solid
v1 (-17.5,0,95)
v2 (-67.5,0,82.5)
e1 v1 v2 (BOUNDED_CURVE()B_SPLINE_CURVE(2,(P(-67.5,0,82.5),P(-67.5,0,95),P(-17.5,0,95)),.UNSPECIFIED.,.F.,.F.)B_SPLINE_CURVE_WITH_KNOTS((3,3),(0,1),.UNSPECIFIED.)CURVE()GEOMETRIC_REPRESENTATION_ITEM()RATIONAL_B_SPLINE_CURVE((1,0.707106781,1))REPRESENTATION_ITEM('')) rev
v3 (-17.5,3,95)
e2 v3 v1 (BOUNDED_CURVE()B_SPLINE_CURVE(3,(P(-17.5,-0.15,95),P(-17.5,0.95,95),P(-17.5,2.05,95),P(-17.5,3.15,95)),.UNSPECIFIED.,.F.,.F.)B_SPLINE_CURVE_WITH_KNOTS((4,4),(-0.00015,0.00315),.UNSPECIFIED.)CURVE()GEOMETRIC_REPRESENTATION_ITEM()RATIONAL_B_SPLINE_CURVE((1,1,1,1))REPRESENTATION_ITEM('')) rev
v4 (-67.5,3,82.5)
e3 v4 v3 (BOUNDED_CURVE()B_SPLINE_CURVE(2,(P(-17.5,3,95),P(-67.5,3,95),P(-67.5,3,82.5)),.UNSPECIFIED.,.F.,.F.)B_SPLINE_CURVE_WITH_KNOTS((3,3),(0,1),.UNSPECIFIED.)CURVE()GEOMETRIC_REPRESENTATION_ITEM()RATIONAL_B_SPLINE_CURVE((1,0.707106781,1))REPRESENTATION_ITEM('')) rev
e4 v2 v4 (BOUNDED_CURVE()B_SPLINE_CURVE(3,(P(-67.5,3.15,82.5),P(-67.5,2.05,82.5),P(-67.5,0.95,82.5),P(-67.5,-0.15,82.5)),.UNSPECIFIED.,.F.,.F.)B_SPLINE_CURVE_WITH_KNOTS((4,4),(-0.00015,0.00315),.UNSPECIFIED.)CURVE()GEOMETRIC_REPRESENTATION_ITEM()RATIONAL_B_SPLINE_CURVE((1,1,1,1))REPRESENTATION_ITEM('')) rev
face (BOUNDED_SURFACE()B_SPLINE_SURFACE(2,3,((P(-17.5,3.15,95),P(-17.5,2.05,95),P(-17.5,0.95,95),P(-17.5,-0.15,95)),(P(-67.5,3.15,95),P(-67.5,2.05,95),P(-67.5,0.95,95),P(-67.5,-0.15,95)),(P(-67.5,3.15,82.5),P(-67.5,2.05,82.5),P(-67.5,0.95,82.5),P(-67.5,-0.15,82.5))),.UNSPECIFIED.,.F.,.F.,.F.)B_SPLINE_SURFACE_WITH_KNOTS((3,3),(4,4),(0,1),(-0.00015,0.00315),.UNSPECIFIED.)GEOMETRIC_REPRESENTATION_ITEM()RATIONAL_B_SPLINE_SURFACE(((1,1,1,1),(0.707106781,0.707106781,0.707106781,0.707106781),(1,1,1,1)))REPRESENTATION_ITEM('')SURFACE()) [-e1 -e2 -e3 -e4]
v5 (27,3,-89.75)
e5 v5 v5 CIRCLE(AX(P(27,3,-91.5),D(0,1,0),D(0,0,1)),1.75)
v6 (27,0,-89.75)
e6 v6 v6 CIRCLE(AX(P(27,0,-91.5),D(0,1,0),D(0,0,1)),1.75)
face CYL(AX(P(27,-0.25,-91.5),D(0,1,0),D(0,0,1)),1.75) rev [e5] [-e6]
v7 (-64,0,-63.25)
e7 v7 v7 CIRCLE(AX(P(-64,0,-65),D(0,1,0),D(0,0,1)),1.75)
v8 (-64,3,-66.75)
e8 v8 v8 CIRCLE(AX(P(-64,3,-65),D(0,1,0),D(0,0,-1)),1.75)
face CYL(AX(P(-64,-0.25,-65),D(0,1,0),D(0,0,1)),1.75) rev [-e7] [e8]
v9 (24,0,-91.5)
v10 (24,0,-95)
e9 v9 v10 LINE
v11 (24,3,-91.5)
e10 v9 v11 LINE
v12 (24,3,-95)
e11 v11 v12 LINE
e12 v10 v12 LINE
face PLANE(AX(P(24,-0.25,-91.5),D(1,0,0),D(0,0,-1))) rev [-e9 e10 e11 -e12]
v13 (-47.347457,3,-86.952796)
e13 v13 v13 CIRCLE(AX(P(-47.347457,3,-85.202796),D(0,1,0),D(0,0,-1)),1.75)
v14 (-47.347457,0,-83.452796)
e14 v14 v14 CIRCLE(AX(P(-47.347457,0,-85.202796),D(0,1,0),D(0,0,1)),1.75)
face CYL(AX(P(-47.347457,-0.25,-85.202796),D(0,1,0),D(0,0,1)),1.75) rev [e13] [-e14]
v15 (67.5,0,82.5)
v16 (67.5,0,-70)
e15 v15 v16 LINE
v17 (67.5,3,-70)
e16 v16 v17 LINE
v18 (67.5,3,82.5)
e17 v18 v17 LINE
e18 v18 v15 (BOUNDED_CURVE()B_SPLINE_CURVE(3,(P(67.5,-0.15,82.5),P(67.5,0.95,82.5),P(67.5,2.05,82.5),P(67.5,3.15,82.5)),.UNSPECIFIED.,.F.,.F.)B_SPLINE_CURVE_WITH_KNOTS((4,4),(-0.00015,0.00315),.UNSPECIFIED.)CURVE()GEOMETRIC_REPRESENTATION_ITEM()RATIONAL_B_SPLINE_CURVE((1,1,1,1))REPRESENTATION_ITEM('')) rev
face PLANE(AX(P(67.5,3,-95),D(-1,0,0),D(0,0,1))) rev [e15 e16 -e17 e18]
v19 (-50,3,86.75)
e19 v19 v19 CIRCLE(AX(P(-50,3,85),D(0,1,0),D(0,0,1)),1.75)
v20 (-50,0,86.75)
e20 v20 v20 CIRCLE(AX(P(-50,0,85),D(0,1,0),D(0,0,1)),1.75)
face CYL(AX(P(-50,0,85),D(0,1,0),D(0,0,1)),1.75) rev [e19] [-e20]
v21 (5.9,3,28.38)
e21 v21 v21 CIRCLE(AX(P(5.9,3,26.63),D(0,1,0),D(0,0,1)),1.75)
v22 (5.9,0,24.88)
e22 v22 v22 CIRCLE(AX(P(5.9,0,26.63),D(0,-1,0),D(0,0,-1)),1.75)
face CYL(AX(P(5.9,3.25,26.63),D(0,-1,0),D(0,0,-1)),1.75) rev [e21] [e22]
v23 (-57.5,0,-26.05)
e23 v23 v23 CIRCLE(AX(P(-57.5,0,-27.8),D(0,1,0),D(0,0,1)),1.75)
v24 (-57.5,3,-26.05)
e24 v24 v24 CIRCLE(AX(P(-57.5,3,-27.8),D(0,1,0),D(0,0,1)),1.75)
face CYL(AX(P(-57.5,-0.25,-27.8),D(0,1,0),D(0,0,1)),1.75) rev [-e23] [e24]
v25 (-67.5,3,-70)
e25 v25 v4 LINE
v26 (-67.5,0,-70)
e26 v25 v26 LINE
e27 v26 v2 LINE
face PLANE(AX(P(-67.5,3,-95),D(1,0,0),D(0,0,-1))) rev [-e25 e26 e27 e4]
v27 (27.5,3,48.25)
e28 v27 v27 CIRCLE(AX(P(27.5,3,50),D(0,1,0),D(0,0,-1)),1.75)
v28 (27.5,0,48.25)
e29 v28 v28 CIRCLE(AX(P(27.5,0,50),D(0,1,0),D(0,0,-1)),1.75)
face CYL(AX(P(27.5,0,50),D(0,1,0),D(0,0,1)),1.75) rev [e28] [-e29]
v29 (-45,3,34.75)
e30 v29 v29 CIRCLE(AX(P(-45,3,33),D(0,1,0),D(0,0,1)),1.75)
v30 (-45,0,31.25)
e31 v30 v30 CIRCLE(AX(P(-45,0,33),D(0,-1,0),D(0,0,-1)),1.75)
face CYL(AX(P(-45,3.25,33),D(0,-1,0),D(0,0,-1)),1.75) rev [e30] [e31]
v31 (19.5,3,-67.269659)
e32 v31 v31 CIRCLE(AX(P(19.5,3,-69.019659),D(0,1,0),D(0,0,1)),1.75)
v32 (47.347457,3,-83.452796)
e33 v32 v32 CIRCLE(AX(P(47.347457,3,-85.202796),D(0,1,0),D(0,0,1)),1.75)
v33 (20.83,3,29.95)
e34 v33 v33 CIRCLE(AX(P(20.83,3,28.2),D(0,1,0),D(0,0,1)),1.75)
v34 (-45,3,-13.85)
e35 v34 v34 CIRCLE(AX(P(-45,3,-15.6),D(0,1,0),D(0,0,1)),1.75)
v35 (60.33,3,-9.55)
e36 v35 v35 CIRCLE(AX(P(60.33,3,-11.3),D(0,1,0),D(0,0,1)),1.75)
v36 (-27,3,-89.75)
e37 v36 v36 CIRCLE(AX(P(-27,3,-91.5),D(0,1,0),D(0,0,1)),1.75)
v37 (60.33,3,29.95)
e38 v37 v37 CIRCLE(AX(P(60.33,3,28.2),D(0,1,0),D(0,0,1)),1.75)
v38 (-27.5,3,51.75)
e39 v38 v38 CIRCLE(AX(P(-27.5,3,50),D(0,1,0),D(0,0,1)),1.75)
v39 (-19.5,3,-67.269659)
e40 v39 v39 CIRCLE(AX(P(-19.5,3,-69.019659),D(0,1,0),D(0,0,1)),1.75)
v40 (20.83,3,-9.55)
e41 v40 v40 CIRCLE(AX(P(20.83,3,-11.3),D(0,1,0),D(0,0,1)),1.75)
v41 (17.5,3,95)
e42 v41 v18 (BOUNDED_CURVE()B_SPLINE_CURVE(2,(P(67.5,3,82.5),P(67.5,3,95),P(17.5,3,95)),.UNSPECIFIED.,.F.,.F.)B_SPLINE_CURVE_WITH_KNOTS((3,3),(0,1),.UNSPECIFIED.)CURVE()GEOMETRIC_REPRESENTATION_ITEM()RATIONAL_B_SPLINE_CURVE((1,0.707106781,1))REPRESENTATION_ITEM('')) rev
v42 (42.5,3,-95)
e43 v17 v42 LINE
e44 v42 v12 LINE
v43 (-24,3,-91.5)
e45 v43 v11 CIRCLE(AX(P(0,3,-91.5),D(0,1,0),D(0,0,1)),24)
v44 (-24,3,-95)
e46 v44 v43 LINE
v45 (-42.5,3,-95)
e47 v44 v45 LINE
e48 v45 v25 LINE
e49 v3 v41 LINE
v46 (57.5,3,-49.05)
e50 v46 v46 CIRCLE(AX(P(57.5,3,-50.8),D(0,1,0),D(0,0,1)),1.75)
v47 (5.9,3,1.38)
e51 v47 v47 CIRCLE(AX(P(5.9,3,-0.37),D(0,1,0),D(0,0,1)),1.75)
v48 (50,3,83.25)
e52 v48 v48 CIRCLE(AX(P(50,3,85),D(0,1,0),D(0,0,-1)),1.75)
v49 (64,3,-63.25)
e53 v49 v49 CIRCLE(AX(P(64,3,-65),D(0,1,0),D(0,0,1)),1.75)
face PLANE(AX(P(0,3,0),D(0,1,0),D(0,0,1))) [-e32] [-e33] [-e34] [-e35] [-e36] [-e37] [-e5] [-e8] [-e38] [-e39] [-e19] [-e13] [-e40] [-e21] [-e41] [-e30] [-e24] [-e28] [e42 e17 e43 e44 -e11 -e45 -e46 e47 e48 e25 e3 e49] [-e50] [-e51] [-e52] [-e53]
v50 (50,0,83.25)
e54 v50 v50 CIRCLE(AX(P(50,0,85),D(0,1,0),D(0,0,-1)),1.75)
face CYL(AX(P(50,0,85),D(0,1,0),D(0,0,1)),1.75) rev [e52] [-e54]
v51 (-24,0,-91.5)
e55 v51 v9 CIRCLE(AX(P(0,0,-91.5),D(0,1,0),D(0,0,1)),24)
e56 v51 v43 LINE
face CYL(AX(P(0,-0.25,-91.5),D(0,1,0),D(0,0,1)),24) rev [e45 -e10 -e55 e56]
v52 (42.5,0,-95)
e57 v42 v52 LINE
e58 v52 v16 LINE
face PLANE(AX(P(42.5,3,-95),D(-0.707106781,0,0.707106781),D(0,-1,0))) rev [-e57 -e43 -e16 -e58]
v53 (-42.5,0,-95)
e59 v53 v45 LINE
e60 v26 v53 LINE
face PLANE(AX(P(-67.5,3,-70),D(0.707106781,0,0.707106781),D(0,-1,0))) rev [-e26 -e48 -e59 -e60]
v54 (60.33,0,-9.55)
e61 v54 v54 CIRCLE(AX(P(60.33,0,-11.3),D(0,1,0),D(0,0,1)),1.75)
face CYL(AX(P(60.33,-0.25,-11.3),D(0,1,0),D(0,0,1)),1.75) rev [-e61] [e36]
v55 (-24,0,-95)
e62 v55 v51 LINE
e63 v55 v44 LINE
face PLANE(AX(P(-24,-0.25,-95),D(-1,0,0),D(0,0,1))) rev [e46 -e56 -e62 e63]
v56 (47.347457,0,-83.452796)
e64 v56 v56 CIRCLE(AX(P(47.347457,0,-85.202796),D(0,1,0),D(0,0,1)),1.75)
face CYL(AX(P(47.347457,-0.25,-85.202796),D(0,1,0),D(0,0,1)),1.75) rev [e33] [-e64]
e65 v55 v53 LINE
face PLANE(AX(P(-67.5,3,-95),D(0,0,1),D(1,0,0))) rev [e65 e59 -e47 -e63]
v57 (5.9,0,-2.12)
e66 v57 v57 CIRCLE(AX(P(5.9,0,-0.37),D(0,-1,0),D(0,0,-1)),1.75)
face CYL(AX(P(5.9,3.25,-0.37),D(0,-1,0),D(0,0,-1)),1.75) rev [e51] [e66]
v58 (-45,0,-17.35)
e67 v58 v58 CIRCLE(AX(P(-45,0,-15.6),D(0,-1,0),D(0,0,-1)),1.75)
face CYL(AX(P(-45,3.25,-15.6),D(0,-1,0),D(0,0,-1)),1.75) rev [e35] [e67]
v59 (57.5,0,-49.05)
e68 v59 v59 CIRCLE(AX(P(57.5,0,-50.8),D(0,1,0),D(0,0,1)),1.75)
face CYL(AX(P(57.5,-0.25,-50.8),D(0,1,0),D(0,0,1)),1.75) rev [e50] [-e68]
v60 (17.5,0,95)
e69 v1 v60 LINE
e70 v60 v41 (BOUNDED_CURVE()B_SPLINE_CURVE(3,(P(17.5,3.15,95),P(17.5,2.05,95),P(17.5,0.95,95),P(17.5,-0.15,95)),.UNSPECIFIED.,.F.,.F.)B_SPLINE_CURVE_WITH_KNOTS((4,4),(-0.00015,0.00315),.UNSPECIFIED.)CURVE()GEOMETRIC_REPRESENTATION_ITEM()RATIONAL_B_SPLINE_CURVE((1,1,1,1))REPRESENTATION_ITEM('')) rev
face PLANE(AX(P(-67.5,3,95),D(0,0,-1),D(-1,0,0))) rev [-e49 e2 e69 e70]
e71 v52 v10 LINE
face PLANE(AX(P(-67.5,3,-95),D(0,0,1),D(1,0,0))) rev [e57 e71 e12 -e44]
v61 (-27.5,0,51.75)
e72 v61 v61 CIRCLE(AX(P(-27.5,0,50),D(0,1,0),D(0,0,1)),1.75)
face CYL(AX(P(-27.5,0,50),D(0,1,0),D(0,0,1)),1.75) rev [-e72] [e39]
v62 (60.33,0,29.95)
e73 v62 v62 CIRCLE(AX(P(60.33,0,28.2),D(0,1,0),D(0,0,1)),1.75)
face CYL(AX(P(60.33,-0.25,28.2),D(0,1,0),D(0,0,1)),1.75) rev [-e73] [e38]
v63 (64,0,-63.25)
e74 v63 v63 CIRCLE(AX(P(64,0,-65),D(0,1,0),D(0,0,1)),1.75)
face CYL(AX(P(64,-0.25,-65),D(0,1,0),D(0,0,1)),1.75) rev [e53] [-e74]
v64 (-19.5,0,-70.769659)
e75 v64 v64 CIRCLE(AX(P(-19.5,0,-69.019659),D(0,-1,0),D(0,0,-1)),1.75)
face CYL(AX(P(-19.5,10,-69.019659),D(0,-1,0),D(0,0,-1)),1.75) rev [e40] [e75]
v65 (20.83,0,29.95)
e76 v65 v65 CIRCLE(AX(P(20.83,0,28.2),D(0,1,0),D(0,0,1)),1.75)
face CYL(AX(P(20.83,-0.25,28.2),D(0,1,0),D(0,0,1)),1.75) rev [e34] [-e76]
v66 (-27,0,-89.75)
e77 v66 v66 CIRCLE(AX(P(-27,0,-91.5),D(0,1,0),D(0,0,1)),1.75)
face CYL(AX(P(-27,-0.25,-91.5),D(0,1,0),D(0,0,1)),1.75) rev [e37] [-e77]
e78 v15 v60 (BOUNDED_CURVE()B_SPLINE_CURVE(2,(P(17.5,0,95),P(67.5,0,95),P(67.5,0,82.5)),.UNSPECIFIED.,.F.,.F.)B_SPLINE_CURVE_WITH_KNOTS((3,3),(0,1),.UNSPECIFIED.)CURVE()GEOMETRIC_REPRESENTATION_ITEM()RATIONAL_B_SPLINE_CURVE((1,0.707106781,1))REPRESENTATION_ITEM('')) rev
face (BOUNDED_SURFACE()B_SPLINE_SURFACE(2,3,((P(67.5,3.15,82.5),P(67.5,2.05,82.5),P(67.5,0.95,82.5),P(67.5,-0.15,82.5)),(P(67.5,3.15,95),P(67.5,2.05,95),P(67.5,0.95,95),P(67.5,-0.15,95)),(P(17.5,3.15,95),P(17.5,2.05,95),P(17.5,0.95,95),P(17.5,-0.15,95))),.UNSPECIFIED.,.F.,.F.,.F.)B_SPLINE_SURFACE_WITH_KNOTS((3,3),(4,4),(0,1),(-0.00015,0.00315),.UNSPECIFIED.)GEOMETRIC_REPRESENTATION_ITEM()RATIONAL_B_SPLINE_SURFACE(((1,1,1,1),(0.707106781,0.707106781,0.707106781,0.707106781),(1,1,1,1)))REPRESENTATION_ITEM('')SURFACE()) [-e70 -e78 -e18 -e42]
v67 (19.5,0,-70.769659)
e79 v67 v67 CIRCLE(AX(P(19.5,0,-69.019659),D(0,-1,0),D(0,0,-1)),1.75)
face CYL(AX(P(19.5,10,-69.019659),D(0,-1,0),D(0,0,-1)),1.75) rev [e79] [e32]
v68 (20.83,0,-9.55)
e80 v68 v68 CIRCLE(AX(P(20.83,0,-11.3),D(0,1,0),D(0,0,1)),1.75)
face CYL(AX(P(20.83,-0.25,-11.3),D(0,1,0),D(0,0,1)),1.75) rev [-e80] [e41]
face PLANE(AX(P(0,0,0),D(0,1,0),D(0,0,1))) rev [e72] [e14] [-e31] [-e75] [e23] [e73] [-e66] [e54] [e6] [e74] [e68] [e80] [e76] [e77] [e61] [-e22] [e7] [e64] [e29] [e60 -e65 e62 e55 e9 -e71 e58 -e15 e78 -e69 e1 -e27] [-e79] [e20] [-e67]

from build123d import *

# Parameters (mm, degrees)
SKETCH2_W           = 135
SKETCH2_H           = 190
BOSS_EXTRUDE2_DEPTH = 3
SKETCH3_R           = 1.75
CUT_EXTRUDE1_DEPTH  = 117.577227622
FILLET1_SIZE        = 12.5
FILLET1_SIZE_2      = 50
FILLET2_SIZE        = 12.5
FILLET2_SIZE_2      = 50
CHAMFER2_SIZE       = 25
CHAMFER3_SIZE       = 25
CUT_EXTRUDE5_DEPTH  = 117.577227764
SKETCH8_R           = 1.75
CUT_EXTRUDE6_DEPTH  = 117.577227764
SKETCH11_R          = 1.75
CUT_EXTRUDE8_DEPTH  = 117.577227764
SKETCH12_R          = 1.75
CUT_EXTRUDE9_DEPTH  = 117.577227764
SKETCH18_R          = 1.75
CUT_EXTRUDE10_DEPTH = 117.577227764
SKETCH19_R          = 1.75
CUT_EXTRUDE11_DEPTH = 117.577227764
SKETCH20_R          = 1.75
CUT_EXTRUDE12_DEPTH = 10


with BuildPart() as part:
    # Sketch2 → Boss-Extrude2 (new body)
    with BuildSketch(Plane(origin=(0, 0, 0), x_dir=(1, 0, 0), z_dir=(0, 1, 0))):
        Rectangle(SKETCH2_W, SKETCH2_H)
    extrude(amount=BOSS_EXTRUDE2_DEPTH)

    # Sketch3 → Cut-Extrude1 (cut, through all)
    with BuildSketch(Plane(origin=(0, 3, 0), x_dir=(1, 0, 0), z_dir=(0, 1, 0))):
        with Locations(Location((-27.5, -50, 0), (0, 0, 270))):
            Circle(SKETCH3_R)
        with Locations(Location((27.5, -50, 0), (0, 0, 90))):
            Circle(SKETCH3_R)
        with Locations(Location((-50, -85, 0), (0, 0, 270))):
            Circle(SKETCH3_R)
        with Locations(Location((50, -85, 0), (0, 0, 90))):
            Circle(SKETCH3_R)
    extrude(amount=-CUT_EXTRUDE1_DEPTH, mode=Mode.SUBTRACT)

    # Fillet1
    # an asymmetric fillet: 50, 12.5 mm, written as the material it takes off along each edge
    with BuildSketch(Plane(origin=(-67.5, -125, 95), x_dir=(0, 0, -1), z_dir=(0, 1, 0))) as fillet1_piece_1:
        with BuildLine():
            Bezier((FILLET1_SIZE, 0), (0, 0), (0, -FILLET1_SIZE_2), weights=[1, 0.707106781, 1])
            Line((0, -FILLET1_SIZE_2), (0, 0))
            Line((0, 0), (FILLET1_SIZE, 0))
        make_face()
    extrude(amount=253, mode=Mode.SUBTRACT)

    # Fillet2
    # an asymmetric fillet: 50, 12.5 mm, written as the material it takes off along each edge
    with BuildSketch(Plane(origin=(67.5, -125, 95), x_dir=(0, 0, -1), z_dir=(0, 1, 0))) as fillet2_piece_1:
        with BuildLine():
            Bezier((FILLET2_SIZE, 0), (0, 0), (0, FILLET2_SIZE_2), weights=[1, 0.707106781, 1])
            Line((0, FILLET2_SIZE_2), (0, 0))
            Line((0, 0), (FILLET2_SIZE, 0))
        make_face()
    extrude(amount=253, mode=Mode.SUBTRACT)

    # Chamfer2
    chamfer2_edges = [part.edges().sort_by_distance(p)[0] for p in [
        (67.5, 1.5, -95),
    ]]
    chamfer(chamfer2_edges, length=CHAMFER2_SIZE)

    # Chamfer3
    chamfer3_edges = [part.edges().sort_by_distance(p)[0] for p in [
        (-67.5, 1.5, -95),
    ]]
    chamfer(chamfer3_edges, length=CHAMFER3_SIZE)

    # Sketch7 → Cut-Extrude5 (cut, through all)
    with BuildSketch(Plane(origin=(0, 3, 0), x_dir=(1, 0, 0), z_dir=(0, 1, 0))):
        with BuildLine():
            Line((24, 91.5), (24, 95))
            Line((24, 95), (-24, 95))
            Line((-24, 95), (-24, 91.5))
            ThreePointArc((-24, 91.5), (0, 67.5), (24, 91.5))
        make_face()
    extrude(amount=-CUT_EXTRUDE5_DEPTH, mode=Mode.SUBTRACT)

    # Sketch8 → Cut-Extrude6 (cut, through all)
    with BuildSketch(Plane(origin=(0, 3, 0), x_dir=(1, 0, 0), z_dir=(0, 1, 0))):
        with Locations(Location((-27, 91.5, 0), (0, 0, 270))):
            Circle(SKETCH8_R)
        with Locations(Location((27, 91.5, 0), (0, 0, 270))):
            Circle(SKETCH8_R)
    extrude(amount=-CUT_EXTRUDE6_DEPTH, mode=Mode.SUBTRACT)

    # Sketch11 → Cut-Extrude8 (cut, through all)
    with BuildSketch(Plane(origin=(0, 3, 0), x_dir=(1, 0, 0), z_dir=(0, 1, 0))):
        with Locations(Location((47.347456736, 85.202795796, 0), (0, 0, 270))):
            Circle(SKETCH11_R)
        with Locations(Location((64, 65, 0), (0, 0, 270))):
            Circle(SKETCH11_R)
        with Locations(Location((-64, 65, 0), (0, 0, 270))):
            Circle(SKETCH11_R)
        with Locations(Location((-47.347456736, 85.202795796, 0), (0, 0, 270))):
            Circle(SKETCH11_R)
    extrude(amount=-CUT_EXTRUDE8_DEPTH, mode=Mode.SUBTRACT)

    # Sketch12 → Cut-Extrude9 (cut, through all)
    with BuildSketch(Plane(origin=(0, 0, 0), x_dir=(-1, 0, 0), z_dir=(0, -1, 0))):
        with Locations(Location((45, -33, 0), (0, 0, 90))):
            Circle(SKETCH12_R)
        with Locations(Location((-5.9, -26.63, 0), (0, 0, 90))):
            Circle(SKETCH12_R)
        with Locations(Location((45, 15.6, 0), (0, 0, 90))):
            Circle(SKETCH12_R)
        with Locations(Location((-5.9, 0.37, 0), (0, 0, 90))):
            Circle(SKETCH12_R)
    extrude(amount=-CUT_EXTRUDE9_DEPTH, mode=Mode.SUBTRACT)

    # Sketch18 → Cut-Extrude10 (cut, through all)
    with BuildSketch(Plane(origin=(0, 3, 0), x_dir=(1, 0, 0), z_dir=(0, 1, 0))):
        with Locations(Location((20.83, -28.2, 0), (0, 0, 270))):
            Circle(SKETCH18_R)
        with Locations(Location((20.83, 11.3, 0), (0, 0, 270))):
            Circle(SKETCH18_R)
        with Locations(Location((60.33, 11.3, 0), (0, 0, 270))):
            Circle(SKETCH18_R)
        with Locations(Location((60.33, -28.2, 0), (0, 0, 270))):
            Circle(SKETCH18_R)
    extrude(amount=-CUT_EXTRUDE10_DEPTH, mode=Mode.SUBTRACT)

    # Sketch19 → Cut-Extrude11 (cut, through all)
    with BuildSketch(Plane(origin=(0, 3, 0), x_dir=(1, 0, 0), z_dir=(0, 1, 0))):
        with Locations(Location((57.5, 50.8, 0), (0, 0, 270))):
            Circle(SKETCH19_R)
        with Locations(Location((-57.5, 27.8, 0), (0, 0, 270))):
            Circle(SKETCH19_R)
    extrude(amount=-CUT_EXTRUDE11_DEPTH, mode=Mode.SUBTRACT)

    # Sketch20 → Cut-Extrude12 (cut)
    with BuildSketch(Plane(origin=(0, 0, 0), x_dir=(-1, 0, 0), z_dir=(0, -1, 0))):
        with Locations(Location((19.5, 69.019658785, 0), (0, 0, 90))):
            Circle(SKETCH20_R)
        with Locations(Location((-19.5, 69.019658785, 0), (0, 0, 90))):
            Circle(SKETCH20_R)
    extrude(amount=-CUT_EXTRUDE12_DEPTH, mode=Mode.SUBTRACT)


solid = part.part
